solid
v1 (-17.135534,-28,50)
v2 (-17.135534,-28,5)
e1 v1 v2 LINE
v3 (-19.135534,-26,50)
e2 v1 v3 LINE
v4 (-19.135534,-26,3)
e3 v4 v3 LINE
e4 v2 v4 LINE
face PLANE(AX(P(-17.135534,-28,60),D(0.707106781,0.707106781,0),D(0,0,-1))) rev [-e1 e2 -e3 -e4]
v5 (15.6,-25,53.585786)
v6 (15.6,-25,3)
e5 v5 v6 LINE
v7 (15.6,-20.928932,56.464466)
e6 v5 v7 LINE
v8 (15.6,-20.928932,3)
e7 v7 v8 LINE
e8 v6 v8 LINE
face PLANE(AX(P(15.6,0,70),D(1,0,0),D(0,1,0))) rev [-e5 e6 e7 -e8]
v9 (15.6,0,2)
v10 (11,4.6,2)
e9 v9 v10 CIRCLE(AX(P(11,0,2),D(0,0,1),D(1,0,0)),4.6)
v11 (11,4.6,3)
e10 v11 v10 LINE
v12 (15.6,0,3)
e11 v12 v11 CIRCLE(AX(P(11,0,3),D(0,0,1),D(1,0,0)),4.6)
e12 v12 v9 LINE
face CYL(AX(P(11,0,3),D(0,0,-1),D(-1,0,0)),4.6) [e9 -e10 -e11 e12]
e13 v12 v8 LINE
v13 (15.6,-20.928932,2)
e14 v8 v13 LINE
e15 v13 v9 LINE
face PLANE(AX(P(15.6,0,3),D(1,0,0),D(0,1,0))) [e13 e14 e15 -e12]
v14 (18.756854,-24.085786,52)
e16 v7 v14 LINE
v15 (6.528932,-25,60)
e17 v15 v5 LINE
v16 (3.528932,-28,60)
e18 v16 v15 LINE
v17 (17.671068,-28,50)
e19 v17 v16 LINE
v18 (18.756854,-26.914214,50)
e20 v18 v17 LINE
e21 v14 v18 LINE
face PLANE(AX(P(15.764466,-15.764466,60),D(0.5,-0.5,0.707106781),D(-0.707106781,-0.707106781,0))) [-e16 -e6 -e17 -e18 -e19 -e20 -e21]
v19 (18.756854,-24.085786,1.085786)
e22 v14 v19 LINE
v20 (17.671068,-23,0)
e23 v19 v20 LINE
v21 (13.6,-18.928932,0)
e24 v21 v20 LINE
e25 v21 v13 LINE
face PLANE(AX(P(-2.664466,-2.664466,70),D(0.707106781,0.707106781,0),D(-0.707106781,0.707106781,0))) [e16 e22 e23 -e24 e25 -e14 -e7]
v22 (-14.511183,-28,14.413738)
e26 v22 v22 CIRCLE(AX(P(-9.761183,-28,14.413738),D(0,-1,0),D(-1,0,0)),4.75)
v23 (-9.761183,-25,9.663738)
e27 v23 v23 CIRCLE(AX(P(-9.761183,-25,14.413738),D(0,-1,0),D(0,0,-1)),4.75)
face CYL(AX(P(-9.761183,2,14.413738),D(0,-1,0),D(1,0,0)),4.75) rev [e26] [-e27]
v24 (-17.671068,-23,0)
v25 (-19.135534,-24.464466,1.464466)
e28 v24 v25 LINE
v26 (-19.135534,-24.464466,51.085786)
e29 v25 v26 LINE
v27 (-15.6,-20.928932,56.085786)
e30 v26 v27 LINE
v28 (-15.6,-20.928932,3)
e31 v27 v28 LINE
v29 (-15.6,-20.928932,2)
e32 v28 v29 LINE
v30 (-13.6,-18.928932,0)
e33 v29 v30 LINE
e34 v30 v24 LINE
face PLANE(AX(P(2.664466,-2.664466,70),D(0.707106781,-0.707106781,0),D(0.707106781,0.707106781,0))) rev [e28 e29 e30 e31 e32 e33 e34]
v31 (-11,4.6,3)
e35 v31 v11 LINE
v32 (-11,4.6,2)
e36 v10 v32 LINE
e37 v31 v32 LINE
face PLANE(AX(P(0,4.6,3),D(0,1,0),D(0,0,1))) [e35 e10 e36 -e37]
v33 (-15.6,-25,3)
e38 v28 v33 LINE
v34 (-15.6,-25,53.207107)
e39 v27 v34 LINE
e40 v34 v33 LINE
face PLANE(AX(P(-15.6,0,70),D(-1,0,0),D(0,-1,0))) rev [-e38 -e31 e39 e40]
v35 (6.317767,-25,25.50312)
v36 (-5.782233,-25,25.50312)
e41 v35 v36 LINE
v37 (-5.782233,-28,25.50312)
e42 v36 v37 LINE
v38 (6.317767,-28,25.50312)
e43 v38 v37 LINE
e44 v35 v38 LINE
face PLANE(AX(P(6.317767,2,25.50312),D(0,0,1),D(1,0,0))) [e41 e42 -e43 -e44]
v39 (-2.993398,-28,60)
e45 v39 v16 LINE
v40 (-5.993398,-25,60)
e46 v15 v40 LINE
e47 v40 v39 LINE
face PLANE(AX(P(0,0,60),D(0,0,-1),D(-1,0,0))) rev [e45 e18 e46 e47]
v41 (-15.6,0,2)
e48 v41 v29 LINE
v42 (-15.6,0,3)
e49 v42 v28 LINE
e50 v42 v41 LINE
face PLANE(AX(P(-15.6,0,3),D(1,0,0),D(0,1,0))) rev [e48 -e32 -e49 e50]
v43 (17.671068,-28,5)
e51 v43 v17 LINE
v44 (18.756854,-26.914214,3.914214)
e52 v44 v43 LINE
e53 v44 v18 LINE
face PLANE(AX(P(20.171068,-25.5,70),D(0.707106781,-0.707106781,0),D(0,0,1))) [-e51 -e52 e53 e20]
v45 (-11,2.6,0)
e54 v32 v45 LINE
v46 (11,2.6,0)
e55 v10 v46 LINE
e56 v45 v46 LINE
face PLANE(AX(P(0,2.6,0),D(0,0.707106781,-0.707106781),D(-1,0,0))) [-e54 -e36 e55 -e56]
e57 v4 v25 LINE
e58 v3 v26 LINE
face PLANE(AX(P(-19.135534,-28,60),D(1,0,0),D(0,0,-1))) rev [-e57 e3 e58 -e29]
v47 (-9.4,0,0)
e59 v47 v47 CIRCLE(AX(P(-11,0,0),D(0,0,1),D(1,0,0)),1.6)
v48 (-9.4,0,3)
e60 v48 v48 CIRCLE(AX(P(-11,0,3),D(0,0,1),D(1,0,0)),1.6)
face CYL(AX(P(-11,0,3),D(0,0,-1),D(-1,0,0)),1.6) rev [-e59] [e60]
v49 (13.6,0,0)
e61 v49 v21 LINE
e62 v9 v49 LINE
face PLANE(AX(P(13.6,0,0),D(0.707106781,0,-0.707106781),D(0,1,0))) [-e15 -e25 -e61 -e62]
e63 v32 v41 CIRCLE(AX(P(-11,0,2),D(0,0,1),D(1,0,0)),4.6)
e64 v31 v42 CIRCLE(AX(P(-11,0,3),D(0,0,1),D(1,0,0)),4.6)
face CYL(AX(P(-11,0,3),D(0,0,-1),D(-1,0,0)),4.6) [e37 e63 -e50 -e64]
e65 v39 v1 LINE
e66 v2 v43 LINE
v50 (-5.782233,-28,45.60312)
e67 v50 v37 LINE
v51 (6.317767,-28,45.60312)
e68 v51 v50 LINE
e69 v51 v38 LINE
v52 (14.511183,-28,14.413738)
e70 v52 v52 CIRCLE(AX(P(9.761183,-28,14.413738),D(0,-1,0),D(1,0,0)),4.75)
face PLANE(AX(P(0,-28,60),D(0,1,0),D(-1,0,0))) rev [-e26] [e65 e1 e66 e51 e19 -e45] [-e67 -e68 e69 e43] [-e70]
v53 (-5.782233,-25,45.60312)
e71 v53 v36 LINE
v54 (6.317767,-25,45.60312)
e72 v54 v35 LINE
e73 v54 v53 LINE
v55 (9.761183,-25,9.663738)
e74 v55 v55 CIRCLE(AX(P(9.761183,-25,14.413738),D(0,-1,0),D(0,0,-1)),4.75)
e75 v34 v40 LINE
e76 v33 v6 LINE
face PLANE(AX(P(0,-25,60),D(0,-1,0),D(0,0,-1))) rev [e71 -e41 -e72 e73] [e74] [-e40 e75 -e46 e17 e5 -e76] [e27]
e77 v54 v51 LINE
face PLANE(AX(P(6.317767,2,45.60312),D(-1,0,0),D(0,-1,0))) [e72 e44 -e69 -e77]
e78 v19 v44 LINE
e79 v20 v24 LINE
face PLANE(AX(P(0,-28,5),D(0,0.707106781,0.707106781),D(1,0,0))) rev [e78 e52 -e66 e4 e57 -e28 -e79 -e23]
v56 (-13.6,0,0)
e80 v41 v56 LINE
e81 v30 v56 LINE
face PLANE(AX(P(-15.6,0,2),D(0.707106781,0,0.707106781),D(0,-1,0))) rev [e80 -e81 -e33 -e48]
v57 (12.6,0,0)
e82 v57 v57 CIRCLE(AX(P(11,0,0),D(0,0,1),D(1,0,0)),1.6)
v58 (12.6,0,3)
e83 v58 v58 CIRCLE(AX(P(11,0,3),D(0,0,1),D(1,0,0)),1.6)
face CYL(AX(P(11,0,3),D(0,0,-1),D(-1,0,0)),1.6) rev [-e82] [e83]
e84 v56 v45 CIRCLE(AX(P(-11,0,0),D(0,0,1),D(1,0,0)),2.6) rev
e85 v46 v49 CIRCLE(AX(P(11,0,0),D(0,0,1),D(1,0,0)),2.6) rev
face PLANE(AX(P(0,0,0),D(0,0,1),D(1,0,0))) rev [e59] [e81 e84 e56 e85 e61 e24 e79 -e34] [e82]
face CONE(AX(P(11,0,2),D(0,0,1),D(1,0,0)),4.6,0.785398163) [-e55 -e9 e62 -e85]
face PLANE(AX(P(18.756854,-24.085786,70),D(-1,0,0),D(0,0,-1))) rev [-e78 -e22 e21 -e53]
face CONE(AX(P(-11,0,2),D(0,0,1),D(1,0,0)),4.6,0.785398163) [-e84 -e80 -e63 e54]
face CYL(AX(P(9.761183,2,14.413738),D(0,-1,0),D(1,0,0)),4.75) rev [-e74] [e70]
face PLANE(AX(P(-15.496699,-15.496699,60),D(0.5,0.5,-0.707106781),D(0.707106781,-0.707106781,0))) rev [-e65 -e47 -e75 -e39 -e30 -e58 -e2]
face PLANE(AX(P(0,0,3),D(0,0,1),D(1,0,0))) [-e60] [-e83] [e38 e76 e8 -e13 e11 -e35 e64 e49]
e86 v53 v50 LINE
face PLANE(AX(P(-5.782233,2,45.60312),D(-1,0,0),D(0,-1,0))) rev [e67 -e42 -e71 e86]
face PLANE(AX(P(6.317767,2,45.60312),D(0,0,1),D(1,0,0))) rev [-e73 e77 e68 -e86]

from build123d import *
from OCP.BRepFilletAPI import BRepFilletAPI_MakeChamfer

# Parameters (mm, degrees)
SKETCH1_R           = 1.6
BOSS_EXTRUDE1_DEPTH = 3
SKETCH3_W           = 31.2
SKETCH3_H           = 3
BOSS_EXTRUDE2_DEPTH = 60
BOSS_EXTRUDE3_DEPTH = 60
CHAMFER1_SIZE       = 5
CHAMFER1_SIZE2      = 3.535533906
CHAMFER2_SIZE       = 2
CHAMFER3_SIZE       = 2
CHAMFER4_SIZE       = 2
SKETCH5_W           = 12.1
SKETCH5_H           = 20.1
CUT_EXTRUDE1_DEPTH  = 30
SKETCH6_R           = 4.75
CUT_EXTRUDE2_DEPTH  = 30
CHAMFER5_SIZE       = 10


with BuildPart() as part:
    # Sketch1 → Boss-Extrude1 (new body)
    with BuildSketch(Plane.XY):
        with BuildLine():
            ThreePointArc((-11, 4.6), (-14.252691193, 3.252691193), (-15.6, 0))
            Line((-15.6, 0), (-15.6, -25))
            Line((-15.6, -25), (15.6, -25))
            Line((15.6, -25), (15.6, 0))
            ThreePointArc((15.6, 0), (14.252691193, 3.252691193), (11, 4.6))
            Line((11, 4.6), (-11, 4.6))
        make_face()
        with Locations((-11, 0)):
            Circle(SKETCH1_R, mode=Mode.SUBTRACT)
        with Locations((11, 0)):
            Circle(SKETCH1_R, mode=Mode.SUBTRACT)
    extrude(amount=BOSS_EXTRUDE1_DEPTH)

    # Sketch3 → Boss-Extrude2 (add)
    with BuildSketch(Plane(origin=(0, 0, 0), x_dir=(-1, 0, 0), z_dir=(0, 0, -1))):
        with Locations((0, -26.5)):
            Rectangle(SKETCH3_W, SKETCH3_H)
    extrude(amount=-BOSS_EXTRUDE2_DEPTH)

    # Sketch4 → Boss-Extrude3 (add)
    with BuildSketch(Plane(origin=(0, 0, 0), x_dir=(-1, 0, 0), z_dir=(0, 0, -1))):
        Polygon((-15.6, -28), (-15.6, -20.928932188), (-22.671067812, -28), align=None)
        Polygon((15.6, -20.928932188), (15.6, -28), (22.671067812, -28), align=None)
    extrude(amount=-BOSS_EXTRUDE3_DEPTH)

    # Chamfer1: one chamfer whose edges measure the first distance from different faces: ONE call of the kernel's chamfer builder (chamfer() names one face for all edges)
    chamfer1_edges_1 = [part.edges().sort_by_distance(p)[0] for p in [
        (0, -28, 0),
    ]]
    chamfer1_edges_2 = [part.edges().sort_by_distance(p)[0] for p in [
        (22.671067812, -28, 30),
    ]]
    chamfer1_side_2 = [part.faces().sort_by_distance(p)[0] for p in [
        (0, -28, 30),
    ]]
    chamfer1_edges_3 = [part.edges().sort_by_distance(p)[0] for p in [
        (-22.671067812, -28, 30),
    ]]
    chamfer1_side_3 = [part.faces().sort_by_distance(p)[0] for p in [
        (-19.135533906, -24.464466094, 30),
    ]]
    chamfer1 = BRepFilletAPI_MakeChamfer(part.part.solid().wrapped)
    for e in chamfer1_edges_1:
        chamfer1.Add(CHAMFER1_SIZE, e.wrapped)
    for e in chamfer1_edges_2:
        chamfer1.Add(CHAMFER1_SIZE, CHAMFER1_SIZE2, e.wrapped, chamfer1_side_2[0].wrapped)  # the first distance lies on this face
    for e in chamfer1_edges_3:
        chamfer1.Add(CHAMFER1_SIZE, CHAMFER1_SIZE2, e.wrapped, chamfer1_side_3[0].wrapped)  # the first distance lies on this face
    add(Compound.cast(chamfer1.Shape()), mode=Mode.REPLACE)

    # Chamfer2
    chamfer2_edges = [part.edges().sort_by_distance(p)[0] for p in [
        (14.252691193, 3.252691193, 0),
        (15.6, -10.464466094, 0),
        (-15.6, -10.464466094, 0),
        (-14.252691193, 3.252691193, 0),
        (0, 4.6, 0),
    ]]
    chamfer(chamfer2_edges, length=CHAMFER2_SIZE)

    # Chamfer3
    chamfer3_edges = [part.edges().sort_by_distance(p)[0] for p in [
        (-19.135533906, -28, 32.5),
    ]]
    chamfer(chamfer3_edges, length=CHAMFER3_SIZE)

    # Chamfer4
    chamfer4_edges = [part.edges().sort_by_distance(p)[0] for p in [
        (20.171067812, -25.5, 31.25),
    ]]
    chamfer(chamfer4_edges, length=CHAMFER4_SIZE)

    # Sketch5 → Cut-Extrude1 (cut)
    with BuildSketch(Plane.XZ.offset(28)):
        with Locations((0.267766953, 35.55312029)):
            Rectangle(SKETCH5_W, SKETCH5_H)
    extrude(amount=-CUT_EXTRUDE1_DEPTH, mode=Mode.SUBTRACT)

    # Sketch6 → Cut-Extrude2 (cut)
    with BuildSketch(Plane.XZ.offset(28)):
        with Locations((9.761183066, 14.413738274)):
            Circle(SKETCH6_R)
        with Locations(Location((-9.761183066, 14.413738274, 0), (0, 0, 270))):
            Circle(SKETCH6_R)
    extrude(amount=-CUT_EXTRUDE2_DEPTH, mode=Mode.SUBTRACT)

    # Chamfer5
    # the kernel refuses this chamfer: 10 mm, written as the material it takes off along each edge
    with BuildSketch(Plane(origin=(-37.320078704, -7.815455201, 60), x_dir=(-0.019442520806014, -0.01944252080601393, -0.9996219169112968), z_dir=(0.7071067811865462, -0.7071067811865488, 0))) as chamfer5_piece_1:
        Polygon((CHAMFER5_SIZE * 0.999621916911, CHAMFER5_SIZE * 0.0274958766106), (-CHAMFER5_SIZE * 0.0274958766106, CHAMFER5_SIZE * 0.999621916911), (0, 0), align=None)
    extrude(amount=54.262086884, mode=Mode.SUBTRACT)
    with BuildSketch(Plane(origin=(-0.513476987, -46.184544799, 60), x_dir=(0.019442520806014572, -0.019442520806014493, -0.9996219169112968), z_dir=(0.7071067811865461, 0.707106781186549, 0))) as chamfer5_piece_2:
        Polygon((CHAMFER5_SIZE * 0.999621916911, CHAMFER5_SIZE * 0.0274958766106), (-CHAMFER5_SIZE * 0.0274958766106, CHAMFER5_SIZE * 0.999621916911), (0, 0), align=None)
    extrude(amount=52.969193665, mode=Mode.SUBTRACT)


solid = part.part
